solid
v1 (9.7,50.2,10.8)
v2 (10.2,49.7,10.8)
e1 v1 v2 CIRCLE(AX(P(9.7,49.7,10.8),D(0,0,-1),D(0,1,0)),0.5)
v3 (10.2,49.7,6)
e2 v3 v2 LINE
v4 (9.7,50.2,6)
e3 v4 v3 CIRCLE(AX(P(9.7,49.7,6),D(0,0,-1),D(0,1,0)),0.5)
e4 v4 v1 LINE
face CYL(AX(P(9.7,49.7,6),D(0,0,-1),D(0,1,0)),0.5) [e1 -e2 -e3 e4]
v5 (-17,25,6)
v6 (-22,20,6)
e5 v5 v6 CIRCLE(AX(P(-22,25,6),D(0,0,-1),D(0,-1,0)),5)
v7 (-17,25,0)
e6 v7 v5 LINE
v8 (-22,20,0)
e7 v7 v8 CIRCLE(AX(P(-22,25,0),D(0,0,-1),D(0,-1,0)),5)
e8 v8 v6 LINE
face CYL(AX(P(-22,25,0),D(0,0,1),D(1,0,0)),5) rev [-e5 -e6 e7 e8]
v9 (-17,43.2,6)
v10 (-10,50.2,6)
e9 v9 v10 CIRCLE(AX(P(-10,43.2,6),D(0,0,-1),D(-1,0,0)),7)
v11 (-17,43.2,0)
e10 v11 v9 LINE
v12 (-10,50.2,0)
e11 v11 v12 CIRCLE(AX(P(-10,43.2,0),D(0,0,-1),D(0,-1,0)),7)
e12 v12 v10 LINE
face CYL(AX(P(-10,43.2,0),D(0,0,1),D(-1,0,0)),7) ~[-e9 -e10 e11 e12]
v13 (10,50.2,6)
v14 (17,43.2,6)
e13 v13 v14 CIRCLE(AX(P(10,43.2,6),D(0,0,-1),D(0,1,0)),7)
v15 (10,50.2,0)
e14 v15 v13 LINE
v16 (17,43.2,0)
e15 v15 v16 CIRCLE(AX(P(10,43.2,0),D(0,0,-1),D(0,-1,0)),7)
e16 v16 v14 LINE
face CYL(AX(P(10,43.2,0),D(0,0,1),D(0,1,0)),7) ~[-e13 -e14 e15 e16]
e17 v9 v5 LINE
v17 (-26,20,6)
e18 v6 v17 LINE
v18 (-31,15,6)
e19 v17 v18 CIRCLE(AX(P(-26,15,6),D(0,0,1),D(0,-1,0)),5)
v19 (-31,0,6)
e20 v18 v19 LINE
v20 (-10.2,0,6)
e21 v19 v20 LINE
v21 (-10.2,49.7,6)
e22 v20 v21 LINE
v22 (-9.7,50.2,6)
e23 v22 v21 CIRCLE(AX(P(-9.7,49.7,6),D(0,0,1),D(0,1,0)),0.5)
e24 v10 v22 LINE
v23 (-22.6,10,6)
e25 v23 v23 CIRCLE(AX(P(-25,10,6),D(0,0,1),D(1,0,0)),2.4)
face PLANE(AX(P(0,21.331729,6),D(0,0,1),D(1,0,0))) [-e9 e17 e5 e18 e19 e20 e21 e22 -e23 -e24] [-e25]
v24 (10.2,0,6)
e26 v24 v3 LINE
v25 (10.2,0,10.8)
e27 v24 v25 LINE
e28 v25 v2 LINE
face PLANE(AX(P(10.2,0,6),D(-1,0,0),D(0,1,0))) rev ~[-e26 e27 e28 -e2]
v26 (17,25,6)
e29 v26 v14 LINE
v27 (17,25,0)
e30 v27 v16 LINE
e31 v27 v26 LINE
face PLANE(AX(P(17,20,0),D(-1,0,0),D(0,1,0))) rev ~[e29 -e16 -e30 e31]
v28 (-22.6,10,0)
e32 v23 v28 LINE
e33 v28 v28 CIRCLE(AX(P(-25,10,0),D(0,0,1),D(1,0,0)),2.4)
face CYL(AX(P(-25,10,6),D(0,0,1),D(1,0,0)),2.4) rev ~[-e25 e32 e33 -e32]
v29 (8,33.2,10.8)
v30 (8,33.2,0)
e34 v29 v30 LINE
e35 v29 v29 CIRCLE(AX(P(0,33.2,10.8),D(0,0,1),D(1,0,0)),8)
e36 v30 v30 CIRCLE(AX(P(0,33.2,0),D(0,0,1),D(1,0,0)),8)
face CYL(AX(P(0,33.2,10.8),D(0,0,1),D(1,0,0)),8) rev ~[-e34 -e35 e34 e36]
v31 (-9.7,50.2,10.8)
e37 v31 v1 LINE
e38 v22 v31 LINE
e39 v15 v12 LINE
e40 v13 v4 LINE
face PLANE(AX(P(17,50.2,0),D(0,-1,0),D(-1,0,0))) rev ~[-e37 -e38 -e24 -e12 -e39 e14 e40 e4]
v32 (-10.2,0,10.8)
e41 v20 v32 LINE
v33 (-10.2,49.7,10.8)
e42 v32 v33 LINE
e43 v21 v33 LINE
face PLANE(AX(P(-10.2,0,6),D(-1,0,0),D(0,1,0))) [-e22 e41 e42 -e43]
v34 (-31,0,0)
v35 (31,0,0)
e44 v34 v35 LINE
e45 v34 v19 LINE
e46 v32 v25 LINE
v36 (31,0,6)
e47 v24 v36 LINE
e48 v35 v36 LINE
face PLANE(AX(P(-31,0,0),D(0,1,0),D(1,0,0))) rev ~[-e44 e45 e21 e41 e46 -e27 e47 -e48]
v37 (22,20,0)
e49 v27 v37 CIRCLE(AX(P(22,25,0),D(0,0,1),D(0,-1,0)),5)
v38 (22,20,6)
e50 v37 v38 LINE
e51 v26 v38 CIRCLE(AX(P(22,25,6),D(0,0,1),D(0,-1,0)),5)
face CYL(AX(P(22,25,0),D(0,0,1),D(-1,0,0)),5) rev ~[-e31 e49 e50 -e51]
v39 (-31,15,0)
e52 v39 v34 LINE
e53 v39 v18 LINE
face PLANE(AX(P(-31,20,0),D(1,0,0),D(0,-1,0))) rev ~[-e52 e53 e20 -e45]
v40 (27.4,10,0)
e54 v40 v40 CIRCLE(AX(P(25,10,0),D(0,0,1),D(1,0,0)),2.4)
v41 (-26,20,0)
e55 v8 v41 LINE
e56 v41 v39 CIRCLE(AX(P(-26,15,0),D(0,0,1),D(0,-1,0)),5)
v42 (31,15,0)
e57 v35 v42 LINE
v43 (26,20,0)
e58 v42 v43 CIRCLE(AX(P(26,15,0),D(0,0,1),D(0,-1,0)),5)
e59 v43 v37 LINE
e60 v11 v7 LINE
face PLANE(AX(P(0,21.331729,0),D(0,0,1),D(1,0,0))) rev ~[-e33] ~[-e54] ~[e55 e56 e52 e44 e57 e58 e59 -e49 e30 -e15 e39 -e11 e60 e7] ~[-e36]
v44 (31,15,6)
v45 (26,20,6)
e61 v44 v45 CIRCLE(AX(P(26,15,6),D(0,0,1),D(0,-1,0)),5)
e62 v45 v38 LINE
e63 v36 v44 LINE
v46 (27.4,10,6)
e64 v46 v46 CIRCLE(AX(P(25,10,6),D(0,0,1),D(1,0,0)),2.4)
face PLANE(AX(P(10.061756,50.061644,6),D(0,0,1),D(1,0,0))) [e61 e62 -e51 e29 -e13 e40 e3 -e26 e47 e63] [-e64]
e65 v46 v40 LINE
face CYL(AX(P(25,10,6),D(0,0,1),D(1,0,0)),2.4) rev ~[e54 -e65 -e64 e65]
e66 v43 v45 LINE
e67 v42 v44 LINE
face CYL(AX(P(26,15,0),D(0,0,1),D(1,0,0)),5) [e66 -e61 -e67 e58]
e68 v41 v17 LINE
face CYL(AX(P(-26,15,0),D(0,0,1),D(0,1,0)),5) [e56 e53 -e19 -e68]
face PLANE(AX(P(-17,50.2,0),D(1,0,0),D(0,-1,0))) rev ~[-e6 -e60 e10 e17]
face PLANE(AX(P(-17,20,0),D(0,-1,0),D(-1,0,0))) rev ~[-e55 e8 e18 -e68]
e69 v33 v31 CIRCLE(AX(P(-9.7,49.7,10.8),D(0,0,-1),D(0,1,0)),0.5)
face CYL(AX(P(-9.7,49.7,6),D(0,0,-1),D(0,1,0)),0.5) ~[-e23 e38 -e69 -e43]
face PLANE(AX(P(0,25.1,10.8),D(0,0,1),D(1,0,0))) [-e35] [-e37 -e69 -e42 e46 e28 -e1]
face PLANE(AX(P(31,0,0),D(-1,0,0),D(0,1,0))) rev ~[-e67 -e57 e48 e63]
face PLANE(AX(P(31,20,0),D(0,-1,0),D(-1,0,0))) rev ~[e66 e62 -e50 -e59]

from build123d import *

# Parameters (mm, degrees)
F1_DEPTH     = 6
F2_W         = 20.4
F2_H         = 50.2
F3_DEPTH     = 4.8
F4_R         = 8
F5_DEPTH     = 10.801
F6_R         = 2.4
F7_DEPTH     = 6.001
F8_R         = 7
F9_R         = 5
F10_T1_DEPTH = 6.0500204163


# Not quite as in the source:
# - a fillet or chamfer that OpenCascade refuses, or shapes differently, is made with other operations: its cross-section is extruded or revolved along the edge and cut away or added


with BuildPart() as f1:
    # F0 (on Top) → F1 (new body)
    with BuildSketch(Plane.XY):
        Polygon((-31, 20), (-31, 0), (31, 0), (31, 20), (17, 20), (17, 50.2), (-17, 50.2), (-17, 20), align=None)
    extrude(amount=F1_DEPTH)

    # F2 (on face) → F3 (join)
    with BuildSketch(Plane.XY.offset(6)):
        with Locations((0, 25.1)):
            Rectangle(F2_W, F2_H)
    extrude(amount=F3_DEPTH)

    # F4 (on face) → F5 (cut, through all)
    with BuildSketch(Plane.XY.offset(10.8)):
        with Locations((0, 33.2)):
            Circle(F4_R)
    extrude(amount=-F5_DEPTH, mode=Mode.SUBTRACT)

    # F6 (on face) → F7 (cut, through all)
    with BuildSketch(Plane.XY.offset(6)):
        with Locations((-25, 10)):
            Circle(F6_R)
        with Locations((25, 10)):
            Circle(F6_R)
    extrude(amount=-F7_DEPTH, mode=Mode.SUBTRACT)

    # F8
    f8_edges = [f1.edges().sort_by_distance(p)[0] for p in [
        (17, 50.2, 3),
        (-17, 50.2, 3),
    ]]
    fillet(f8_edges, radius=F8_R)

    # F9
    f9_edges = [f1.edges().sort_by_distance(p)[0] for p in [
        (-31, 20, 3),
        (31, 20, 3),
        (17, 20, 3),
        (-17, 20, 3),
    ]]
    fillet(f9_edges, radius=F9_R)

    # F10: fillet of radius 0.5 on 2 edges, made by hand

    # F10_s2 → F10_t1 (cut)
    with BuildSketch(Plane.XY.offset(6)):
        with BuildLine():
            ThreePointArc((9.7, 50.2), (10.0535533906, 50.0535533906), (10.2, 49.7))
            Line((10.2, 49.7), (10.25, 49.7))
            Line((10.25, 49.7), (10.25, 50.1971422738))
            Line((10.25, 50.1971422738), (10.2014285714, 50.2471218615))
            ThreePointArc((10.2014285714, 50.2471218615), (10, 50.25), (9.7, 50.25))
            Line((9.7, 50.25), (9.7, 50.2))
        make_face()
        with BuildLine():
            ThreePointArc((-9.7, 50.2), (-10.0535533906, 50.0535533906), (-10.2, 49.7))
            Line((-10.2, 49.7), (-10.25, 49.7))
            Line((-10.25, 49.7), (-10.25, 50.1971422738))
            Line((-10.25, 50.1971422738), (-10.2014285714, 50.2471218615))
            ThreePointArc((-10.2014285714, 50.2471218615), (-10, 50.25), (-9.7, 50.25))
            Line((-9.7, 50.25), (-9.7, 50.2))
        make_face()
    extrude(amount=F10_T1_DEPTH, mode=Mode.SUBTRACT)


solid = f1.part
